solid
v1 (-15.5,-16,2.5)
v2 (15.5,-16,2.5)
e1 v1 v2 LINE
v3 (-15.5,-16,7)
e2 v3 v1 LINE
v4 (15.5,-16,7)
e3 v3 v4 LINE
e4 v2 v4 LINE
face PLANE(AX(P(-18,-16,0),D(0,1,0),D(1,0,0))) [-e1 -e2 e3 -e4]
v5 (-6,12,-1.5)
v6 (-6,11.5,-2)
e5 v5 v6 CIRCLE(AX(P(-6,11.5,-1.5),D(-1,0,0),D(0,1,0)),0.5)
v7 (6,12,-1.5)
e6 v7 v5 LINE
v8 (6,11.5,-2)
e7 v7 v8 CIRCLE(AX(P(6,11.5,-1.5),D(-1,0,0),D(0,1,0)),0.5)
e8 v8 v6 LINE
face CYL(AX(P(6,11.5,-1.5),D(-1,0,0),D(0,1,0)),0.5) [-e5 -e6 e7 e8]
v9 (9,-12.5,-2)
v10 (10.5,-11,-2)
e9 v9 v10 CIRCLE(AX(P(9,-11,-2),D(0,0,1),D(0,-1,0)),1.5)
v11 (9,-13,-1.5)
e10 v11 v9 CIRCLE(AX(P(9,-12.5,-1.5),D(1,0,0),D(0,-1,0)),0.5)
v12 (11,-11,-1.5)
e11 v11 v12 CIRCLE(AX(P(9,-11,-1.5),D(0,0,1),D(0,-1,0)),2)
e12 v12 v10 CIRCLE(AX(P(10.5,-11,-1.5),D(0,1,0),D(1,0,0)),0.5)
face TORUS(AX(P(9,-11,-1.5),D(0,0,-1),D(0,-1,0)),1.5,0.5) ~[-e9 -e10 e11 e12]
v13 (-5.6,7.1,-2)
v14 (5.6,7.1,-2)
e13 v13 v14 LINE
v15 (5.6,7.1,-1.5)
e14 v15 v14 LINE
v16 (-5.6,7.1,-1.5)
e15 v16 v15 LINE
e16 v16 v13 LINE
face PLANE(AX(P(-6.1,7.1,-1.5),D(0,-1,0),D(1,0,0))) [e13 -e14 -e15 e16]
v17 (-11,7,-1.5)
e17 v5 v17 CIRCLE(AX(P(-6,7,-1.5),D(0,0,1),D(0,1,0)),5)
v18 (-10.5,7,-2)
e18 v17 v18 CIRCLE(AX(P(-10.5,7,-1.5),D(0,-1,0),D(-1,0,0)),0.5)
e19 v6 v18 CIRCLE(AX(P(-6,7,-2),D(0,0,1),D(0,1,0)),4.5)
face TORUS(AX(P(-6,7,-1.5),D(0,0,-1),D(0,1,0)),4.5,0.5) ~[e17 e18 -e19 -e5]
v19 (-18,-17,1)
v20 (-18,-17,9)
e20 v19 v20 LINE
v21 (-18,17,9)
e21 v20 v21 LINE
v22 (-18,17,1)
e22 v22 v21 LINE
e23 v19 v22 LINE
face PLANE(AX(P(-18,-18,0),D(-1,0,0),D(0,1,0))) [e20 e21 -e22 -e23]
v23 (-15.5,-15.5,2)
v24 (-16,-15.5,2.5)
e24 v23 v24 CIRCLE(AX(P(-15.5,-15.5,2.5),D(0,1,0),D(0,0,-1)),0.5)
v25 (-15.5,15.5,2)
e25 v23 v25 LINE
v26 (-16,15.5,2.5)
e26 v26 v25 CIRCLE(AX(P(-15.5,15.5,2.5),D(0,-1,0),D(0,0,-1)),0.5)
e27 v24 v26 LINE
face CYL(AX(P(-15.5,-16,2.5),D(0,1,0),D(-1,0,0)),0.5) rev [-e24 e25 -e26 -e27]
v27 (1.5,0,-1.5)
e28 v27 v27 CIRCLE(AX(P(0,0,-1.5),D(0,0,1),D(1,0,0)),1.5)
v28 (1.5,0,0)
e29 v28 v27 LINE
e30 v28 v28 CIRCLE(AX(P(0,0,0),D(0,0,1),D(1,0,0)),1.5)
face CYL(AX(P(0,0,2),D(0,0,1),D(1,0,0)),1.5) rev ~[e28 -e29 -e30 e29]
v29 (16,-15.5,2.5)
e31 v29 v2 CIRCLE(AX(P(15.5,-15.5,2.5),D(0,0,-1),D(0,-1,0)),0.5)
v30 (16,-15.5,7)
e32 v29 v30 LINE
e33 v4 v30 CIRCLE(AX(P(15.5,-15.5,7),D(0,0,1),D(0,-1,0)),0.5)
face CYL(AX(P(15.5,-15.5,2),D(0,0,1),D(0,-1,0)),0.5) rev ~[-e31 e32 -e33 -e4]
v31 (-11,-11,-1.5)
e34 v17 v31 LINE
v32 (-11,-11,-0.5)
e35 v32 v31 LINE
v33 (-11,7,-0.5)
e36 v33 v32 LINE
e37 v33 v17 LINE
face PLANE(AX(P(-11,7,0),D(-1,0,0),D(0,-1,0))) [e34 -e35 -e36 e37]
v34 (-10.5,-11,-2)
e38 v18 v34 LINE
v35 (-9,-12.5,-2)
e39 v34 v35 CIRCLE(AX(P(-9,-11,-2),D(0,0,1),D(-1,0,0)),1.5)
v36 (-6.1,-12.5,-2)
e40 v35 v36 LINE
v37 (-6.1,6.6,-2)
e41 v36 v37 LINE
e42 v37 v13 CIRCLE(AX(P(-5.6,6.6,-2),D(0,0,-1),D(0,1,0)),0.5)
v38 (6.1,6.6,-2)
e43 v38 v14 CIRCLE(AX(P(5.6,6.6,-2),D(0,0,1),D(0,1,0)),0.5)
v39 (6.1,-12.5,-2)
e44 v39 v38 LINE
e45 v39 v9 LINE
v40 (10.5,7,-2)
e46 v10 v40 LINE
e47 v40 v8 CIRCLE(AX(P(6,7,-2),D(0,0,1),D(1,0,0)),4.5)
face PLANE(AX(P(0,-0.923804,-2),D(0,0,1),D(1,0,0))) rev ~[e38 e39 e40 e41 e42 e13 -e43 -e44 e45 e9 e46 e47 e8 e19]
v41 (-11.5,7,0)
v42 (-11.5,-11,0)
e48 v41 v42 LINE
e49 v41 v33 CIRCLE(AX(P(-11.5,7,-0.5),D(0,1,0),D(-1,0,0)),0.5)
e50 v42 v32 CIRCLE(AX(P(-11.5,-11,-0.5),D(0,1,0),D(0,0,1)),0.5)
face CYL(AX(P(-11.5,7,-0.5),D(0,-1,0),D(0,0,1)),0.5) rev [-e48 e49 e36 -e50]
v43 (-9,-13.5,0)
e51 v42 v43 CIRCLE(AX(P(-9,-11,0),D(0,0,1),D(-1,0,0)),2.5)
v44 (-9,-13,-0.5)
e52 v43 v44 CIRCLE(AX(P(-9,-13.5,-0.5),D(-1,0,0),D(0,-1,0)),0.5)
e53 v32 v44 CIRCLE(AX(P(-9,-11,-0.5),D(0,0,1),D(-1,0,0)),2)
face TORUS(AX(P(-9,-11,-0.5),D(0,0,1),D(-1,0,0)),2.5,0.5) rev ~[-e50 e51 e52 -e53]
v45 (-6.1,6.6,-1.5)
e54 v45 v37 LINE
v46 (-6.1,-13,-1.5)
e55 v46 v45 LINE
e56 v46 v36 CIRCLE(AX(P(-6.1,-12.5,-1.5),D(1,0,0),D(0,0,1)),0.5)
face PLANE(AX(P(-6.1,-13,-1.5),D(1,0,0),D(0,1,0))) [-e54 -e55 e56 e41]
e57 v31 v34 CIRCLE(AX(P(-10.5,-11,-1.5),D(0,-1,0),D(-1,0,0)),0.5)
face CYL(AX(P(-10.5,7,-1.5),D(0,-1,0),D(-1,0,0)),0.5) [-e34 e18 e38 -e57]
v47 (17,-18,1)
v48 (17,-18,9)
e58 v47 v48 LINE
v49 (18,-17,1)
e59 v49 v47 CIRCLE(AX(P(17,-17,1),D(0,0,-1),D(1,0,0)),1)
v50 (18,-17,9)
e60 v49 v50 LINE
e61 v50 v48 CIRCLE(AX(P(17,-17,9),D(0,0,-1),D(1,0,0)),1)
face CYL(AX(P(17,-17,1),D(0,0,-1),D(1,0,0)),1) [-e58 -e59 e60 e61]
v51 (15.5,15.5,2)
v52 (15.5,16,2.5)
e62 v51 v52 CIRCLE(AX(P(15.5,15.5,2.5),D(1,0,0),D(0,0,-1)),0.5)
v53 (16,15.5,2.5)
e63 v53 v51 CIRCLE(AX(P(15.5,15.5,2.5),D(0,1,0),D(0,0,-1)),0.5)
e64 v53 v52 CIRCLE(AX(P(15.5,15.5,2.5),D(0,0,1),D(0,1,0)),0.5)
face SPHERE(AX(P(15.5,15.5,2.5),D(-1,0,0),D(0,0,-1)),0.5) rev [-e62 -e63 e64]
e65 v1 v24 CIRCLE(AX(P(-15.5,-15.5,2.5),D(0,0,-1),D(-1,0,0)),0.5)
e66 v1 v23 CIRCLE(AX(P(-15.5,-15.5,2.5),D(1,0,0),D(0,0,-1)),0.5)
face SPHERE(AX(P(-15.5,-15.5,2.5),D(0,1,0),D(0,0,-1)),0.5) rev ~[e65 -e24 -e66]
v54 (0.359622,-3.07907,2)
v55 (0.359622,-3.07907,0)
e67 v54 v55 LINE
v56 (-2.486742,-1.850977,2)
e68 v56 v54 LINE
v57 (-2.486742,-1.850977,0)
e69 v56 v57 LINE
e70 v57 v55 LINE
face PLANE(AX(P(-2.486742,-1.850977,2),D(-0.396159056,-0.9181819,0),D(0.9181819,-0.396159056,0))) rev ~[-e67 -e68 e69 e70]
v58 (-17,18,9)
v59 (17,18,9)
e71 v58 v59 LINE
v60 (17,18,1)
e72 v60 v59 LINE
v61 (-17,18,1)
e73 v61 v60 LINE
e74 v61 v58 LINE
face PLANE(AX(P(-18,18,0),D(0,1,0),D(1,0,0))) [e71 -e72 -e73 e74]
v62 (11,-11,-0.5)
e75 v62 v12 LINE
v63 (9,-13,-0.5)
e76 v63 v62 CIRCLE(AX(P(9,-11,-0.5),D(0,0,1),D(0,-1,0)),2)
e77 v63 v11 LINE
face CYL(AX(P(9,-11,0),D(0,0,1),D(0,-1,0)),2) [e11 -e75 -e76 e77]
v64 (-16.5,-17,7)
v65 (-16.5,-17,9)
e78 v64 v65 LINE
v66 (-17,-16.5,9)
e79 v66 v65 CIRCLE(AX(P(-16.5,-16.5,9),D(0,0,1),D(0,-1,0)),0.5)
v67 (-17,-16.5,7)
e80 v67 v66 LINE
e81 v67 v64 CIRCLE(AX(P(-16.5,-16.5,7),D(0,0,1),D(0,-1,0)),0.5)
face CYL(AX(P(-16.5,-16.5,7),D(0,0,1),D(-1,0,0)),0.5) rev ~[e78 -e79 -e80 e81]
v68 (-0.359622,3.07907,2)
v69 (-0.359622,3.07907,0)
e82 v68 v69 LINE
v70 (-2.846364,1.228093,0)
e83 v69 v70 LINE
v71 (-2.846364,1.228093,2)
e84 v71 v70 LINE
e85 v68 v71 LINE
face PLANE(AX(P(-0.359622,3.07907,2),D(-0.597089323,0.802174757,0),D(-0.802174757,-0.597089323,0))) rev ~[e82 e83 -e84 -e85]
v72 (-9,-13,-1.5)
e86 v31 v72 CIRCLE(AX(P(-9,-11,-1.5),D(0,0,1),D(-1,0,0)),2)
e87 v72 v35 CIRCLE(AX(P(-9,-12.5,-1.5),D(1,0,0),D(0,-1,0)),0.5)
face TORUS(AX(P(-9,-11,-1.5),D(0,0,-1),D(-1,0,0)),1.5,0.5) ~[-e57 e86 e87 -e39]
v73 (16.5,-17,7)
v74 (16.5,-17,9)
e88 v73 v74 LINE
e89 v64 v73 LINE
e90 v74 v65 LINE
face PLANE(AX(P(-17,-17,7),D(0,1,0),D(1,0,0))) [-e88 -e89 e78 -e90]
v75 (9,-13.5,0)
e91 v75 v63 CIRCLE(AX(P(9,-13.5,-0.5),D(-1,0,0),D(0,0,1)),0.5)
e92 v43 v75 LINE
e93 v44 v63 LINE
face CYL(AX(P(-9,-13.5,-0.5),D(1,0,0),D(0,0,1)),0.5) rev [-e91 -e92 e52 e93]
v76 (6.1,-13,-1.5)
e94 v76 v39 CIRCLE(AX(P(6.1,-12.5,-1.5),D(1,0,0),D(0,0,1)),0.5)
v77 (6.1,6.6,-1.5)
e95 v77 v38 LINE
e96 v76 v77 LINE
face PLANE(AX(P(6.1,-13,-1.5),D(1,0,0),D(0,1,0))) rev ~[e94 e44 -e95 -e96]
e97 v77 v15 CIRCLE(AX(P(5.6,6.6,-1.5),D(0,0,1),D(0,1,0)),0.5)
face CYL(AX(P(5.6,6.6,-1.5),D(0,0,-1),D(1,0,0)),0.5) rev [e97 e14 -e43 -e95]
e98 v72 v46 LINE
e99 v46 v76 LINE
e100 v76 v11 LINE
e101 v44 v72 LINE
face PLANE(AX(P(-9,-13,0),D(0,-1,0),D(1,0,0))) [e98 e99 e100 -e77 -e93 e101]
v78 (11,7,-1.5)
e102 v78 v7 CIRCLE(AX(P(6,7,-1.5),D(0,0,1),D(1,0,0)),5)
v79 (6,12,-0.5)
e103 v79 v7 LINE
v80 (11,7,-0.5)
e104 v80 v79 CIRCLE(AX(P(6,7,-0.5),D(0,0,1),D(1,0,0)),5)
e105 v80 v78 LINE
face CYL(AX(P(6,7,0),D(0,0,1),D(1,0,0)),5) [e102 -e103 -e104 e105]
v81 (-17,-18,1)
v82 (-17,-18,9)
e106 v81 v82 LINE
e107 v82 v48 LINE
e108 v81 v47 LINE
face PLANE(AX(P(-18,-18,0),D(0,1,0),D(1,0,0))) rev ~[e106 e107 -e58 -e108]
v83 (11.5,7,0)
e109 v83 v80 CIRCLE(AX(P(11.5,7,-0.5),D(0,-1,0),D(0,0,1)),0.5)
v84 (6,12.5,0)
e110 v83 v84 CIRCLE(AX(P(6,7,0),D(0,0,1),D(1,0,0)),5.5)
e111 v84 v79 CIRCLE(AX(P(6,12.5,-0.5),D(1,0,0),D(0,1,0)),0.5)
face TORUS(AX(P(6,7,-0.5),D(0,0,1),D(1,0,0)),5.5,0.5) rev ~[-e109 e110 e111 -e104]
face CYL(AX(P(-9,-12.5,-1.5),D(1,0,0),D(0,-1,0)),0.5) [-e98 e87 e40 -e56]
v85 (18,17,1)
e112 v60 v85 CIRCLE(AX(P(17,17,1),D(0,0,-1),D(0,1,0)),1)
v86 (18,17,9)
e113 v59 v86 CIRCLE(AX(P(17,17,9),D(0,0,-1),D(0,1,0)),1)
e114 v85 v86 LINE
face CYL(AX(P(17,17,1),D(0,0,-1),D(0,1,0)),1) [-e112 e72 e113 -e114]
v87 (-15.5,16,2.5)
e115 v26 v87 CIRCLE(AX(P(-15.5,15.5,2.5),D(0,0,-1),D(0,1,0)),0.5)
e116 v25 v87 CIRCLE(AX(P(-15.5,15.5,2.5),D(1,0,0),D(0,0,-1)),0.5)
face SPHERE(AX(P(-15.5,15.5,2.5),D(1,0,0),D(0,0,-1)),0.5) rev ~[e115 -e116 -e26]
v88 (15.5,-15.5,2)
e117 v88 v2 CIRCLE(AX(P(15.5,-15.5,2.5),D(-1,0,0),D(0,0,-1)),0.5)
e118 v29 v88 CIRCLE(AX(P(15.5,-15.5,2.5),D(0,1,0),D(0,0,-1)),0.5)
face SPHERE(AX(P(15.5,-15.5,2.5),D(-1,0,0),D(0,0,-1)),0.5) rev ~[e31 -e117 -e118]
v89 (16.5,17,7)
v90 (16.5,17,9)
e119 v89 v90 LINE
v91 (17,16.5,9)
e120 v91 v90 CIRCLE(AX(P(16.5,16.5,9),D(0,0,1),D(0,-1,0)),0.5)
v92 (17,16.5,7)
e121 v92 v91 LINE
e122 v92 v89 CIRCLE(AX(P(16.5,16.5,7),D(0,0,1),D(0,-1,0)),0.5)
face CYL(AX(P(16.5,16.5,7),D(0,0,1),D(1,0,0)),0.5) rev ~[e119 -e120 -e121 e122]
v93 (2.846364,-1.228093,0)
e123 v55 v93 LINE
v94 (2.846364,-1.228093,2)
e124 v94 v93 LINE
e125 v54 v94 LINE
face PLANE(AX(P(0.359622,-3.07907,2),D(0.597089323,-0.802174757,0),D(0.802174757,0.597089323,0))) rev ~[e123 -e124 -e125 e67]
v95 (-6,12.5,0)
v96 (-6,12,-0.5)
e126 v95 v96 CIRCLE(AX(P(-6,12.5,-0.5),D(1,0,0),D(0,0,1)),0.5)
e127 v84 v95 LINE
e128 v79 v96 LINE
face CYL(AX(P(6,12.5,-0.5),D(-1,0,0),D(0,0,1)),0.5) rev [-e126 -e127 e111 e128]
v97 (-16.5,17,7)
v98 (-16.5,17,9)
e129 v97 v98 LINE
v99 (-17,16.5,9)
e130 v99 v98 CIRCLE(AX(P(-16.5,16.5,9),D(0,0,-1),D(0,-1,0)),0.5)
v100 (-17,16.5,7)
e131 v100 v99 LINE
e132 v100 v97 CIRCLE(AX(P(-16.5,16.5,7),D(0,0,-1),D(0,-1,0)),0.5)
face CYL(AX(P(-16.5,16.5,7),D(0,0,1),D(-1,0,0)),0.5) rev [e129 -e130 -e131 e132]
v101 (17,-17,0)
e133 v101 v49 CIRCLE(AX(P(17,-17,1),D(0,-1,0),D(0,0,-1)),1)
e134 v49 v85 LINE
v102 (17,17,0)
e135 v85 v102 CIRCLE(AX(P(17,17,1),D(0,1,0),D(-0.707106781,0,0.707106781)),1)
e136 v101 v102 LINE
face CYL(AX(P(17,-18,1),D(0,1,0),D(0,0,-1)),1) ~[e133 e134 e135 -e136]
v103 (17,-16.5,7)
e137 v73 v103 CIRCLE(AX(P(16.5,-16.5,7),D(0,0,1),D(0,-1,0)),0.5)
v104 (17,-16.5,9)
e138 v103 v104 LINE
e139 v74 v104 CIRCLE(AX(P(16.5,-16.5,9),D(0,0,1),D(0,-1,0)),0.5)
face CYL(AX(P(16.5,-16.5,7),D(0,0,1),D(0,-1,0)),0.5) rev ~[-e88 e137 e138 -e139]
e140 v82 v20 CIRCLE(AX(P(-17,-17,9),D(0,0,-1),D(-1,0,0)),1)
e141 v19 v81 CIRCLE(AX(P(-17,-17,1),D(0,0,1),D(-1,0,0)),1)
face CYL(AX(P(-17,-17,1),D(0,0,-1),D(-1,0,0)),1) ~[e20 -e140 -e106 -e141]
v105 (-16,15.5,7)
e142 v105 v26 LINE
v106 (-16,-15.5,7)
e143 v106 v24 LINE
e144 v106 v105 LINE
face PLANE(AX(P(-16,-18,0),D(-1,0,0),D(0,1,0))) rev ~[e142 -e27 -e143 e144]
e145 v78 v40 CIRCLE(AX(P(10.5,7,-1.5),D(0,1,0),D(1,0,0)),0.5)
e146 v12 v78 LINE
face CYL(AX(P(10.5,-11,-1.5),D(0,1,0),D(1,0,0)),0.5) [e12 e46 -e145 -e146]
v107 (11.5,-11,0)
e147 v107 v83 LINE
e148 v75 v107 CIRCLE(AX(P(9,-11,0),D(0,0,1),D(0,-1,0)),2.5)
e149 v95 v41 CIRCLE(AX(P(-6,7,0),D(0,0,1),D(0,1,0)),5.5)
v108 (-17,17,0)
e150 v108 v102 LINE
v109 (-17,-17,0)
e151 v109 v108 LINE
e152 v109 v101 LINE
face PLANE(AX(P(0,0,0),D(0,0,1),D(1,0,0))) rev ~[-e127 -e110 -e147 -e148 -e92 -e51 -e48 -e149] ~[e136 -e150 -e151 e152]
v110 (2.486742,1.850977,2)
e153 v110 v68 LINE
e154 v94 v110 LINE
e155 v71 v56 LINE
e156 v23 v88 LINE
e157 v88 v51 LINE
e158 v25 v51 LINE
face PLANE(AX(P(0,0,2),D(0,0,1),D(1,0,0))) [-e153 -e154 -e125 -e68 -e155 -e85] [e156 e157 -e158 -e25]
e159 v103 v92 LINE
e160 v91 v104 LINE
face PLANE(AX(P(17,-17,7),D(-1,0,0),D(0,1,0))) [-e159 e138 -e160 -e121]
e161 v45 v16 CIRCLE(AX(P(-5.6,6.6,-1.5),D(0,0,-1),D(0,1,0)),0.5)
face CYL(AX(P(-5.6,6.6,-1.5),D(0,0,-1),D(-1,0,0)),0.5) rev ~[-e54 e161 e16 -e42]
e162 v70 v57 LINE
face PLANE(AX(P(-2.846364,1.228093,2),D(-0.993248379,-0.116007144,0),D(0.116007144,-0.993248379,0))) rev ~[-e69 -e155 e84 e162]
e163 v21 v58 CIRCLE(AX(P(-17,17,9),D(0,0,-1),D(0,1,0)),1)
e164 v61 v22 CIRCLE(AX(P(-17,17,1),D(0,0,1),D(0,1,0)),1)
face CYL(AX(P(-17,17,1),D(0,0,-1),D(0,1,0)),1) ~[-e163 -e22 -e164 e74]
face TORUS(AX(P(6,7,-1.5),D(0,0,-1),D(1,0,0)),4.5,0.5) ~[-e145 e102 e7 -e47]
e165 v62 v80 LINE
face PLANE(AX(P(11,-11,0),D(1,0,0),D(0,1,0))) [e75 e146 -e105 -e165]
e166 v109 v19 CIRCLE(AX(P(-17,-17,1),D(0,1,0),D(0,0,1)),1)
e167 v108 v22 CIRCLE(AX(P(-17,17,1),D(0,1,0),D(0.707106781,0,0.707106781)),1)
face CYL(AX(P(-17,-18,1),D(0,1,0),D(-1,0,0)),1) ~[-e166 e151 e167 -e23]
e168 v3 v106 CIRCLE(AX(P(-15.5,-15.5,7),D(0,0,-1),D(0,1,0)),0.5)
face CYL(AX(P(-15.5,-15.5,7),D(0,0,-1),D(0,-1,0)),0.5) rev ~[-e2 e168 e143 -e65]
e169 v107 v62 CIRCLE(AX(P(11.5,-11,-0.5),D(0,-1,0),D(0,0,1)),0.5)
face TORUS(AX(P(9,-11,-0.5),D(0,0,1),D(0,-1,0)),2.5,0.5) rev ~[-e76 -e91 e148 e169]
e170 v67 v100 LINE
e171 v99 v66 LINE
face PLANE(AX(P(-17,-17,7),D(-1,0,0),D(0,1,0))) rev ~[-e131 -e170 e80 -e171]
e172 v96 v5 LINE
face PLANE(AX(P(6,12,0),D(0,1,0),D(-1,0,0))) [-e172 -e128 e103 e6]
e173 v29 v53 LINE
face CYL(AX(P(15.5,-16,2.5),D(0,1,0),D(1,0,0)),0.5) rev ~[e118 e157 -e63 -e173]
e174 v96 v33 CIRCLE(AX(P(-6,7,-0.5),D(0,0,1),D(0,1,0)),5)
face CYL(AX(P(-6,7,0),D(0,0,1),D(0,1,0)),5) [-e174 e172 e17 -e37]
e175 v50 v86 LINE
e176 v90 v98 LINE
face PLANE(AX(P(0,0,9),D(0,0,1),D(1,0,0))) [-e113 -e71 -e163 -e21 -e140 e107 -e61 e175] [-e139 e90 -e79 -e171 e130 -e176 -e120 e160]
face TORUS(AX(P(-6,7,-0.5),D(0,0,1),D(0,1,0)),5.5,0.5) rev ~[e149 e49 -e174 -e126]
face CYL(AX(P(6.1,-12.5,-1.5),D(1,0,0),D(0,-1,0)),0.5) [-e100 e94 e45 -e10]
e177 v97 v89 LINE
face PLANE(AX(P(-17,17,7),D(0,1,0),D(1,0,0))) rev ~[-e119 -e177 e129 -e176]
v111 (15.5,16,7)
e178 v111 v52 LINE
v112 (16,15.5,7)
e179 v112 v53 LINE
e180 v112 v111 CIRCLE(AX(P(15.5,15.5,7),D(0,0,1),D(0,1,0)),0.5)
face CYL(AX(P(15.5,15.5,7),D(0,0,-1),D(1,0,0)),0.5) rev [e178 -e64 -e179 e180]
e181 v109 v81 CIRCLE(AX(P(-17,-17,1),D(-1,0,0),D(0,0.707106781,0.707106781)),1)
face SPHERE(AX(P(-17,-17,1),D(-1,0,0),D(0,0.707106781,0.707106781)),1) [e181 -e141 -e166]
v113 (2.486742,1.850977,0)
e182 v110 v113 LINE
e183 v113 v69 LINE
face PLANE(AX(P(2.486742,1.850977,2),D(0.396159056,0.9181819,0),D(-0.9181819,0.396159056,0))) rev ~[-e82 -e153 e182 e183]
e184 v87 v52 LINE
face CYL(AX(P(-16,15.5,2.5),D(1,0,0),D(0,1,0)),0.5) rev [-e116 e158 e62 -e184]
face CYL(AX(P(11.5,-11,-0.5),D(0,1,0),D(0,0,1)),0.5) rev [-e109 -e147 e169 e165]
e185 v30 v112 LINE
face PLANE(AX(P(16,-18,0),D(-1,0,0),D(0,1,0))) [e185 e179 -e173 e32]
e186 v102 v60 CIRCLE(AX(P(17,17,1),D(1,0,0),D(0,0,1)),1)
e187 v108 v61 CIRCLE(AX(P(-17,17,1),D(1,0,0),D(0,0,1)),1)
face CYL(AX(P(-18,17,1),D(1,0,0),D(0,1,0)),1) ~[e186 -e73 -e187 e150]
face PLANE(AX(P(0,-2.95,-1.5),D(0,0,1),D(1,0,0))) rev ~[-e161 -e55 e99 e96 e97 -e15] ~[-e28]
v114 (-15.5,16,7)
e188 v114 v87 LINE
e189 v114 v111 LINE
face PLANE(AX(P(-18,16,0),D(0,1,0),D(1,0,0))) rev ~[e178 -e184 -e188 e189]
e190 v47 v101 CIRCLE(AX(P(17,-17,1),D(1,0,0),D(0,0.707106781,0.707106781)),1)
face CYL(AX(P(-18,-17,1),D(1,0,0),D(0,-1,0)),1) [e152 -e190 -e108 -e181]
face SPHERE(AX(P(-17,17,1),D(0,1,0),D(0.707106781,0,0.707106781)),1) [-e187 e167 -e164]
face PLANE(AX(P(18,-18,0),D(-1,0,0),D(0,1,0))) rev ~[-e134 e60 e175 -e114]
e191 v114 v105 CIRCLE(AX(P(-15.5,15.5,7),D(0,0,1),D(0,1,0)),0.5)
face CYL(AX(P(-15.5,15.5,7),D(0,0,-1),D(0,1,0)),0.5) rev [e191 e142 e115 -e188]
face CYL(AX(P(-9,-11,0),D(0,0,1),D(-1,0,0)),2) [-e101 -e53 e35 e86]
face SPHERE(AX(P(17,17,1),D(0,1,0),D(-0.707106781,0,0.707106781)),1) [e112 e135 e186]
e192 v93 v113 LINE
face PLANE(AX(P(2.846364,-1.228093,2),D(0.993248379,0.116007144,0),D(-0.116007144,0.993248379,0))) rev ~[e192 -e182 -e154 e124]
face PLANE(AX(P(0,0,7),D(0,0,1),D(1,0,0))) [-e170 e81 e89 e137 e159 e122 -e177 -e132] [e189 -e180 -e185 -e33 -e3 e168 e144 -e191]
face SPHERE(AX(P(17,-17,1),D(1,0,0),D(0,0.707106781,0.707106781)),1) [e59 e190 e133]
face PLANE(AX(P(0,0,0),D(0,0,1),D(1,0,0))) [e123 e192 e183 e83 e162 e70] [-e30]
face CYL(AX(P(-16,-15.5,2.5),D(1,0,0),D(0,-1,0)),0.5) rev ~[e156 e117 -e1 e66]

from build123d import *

# Parameters (mm, degrees)
F1_W         = 36
F1_H         = 36
F2_DEPTH     = 9
F3_T         = -2
F4_START     = 7
F0_W         = 34
F0_H         = 34
F4_DEPTH     = 3
F5_R         = 1
F6_R         = 0.5
F7_T1_DEPTH  = 10.5
F7_S5_W      = 1
F7_S5_H      = 1
F7_T6_DEPTH  = 1
F7_S11_W     = 1
F7_S11_H     = 1
F7_T12_DEPTH = 1
F7_S17_W     = 1
F7_S17_H     = 1
F7_T18_DEPTH = 1
F7_S23_W     = 1
F7_S23_H     = 1
F7_T24_DEPTH = 1
F9_DEPTH     = 2
F11_START    = -1.5
F10_W        = 12.2
F10_H        = 20.1
F11_DEPTH    = 2.5
F13_DEPTH    = 2
F14_R        = 1.5
F15_DEPTH    = 4.001
F16_R        = 0.5
F17_R        = 0.5


# Not quite as in the source:
# - a fillet or chamfer that OpenCascade refuses, or shapes differently, is made with other operations: its cross-section is extruded or revolved along the edge and cut away or added


with BuildPart() as f2:
    # F1 (on Top) → F2 (new body)
    with BuildSketch(Plane.XY):
        Rectangle(F1_W, F1_H)
    extrude(amount=F2_DEPTH)

    # F3
    f3_openings = [f2.faces().sort_by_distance(p)[0] for p in [
        (0, 0, 9),
    ]]
    offset(amount=F3_T, openings=f3_openings)

    # F0 (on Top) → F4 (cut)
    with BuildSketch(Plane.XY.offset(F4_START)):
        Rectangle(F0_W, F0_H)
    extrude(amount=F4_DEPTH, mode=Mode.SUBTRACT)

    # F5
    f5_edges = [f2.edges().sort_by_distance(p)[0] for p in [
        (18, 0, 0),
        (0, 18, 0),
        (-18, 0, 0),
        (0, -18, 0),
    ]]
    fillet(f5_edges, radius=F5_R)

    # F6
    f6_edges = [f2.edges().sort_by_distance(p)[0] for p in [
        (0, 16, 2),
        (-16, 0, 2),
        (0, -16, 2),
        (16, 0, 2),
        (-16, 16, 4.5),
        (16, 16, 4.5),
        (17, 17, 8),
        (17, -17, 8),
        (16, -16, 4.5),
        (-17, -17, 8),
        (-16, -16, 4.5),
        (-17, 17, 8),
    ]]
    fillet(f6_edges, radius=F6_R)

    # F7: fillet of radius 1 on 4 edges, made by hand

    # F7_s2 → F7_t1 (cut)
    with BuildSketch(Plane.XY.offset(1)):
        with BuildLine():
            ThreePointArc((-18, -17), (-17.7071067812, -17.7071067812), (-17, -18))
            Line((-17, -18), (-18, -18))
            Line((-18, -18), (-18, -17))
        make_face()
        with BuildLine():
            ThreePointArc((17, 18), (17.7071067812, 17.7071067812), (18, 17))
            Line((18, 17), (18, 18))
            Line((18, 18), (17, 18))
        make_face()
        with BuildLine():
            ThreePointArc((18, -17), (17.7071067812, -17.7071067812), (17, -18))
            Line((17, -18), (18, -18))
            Line((18, -18), (18, -17))
        make_face()
        with BuildLine():
            ThreePointArc((-17, 18), (-17.7071067812, 17.7071067812), (-18, 17))
            Line((-18, 17), (-18, 18))
            Line((-18, 18), (-17, 18))
        make_face()
    extrude(amount=F7_T1_DEPTH, mode=Mode.SUBTRACT)


with BuildPart() as f7_tool4:
    # F7_s5 → F7_t6 (new body)
    with BuildSketch(Plane.XZ.offset(-17)):
        with Locations((-17.5, 0.5)):
            Rectangle(F7_S5_W, F7_S5_H)
    extrude(amount=-F7_T6_DEPTH)

    # F7_s7 → F7_t8 (revolve, cut)
    with BuildSketch(Plane(origin=(-17, 17, 1), x_dir=(0.7071067812, 0, 0.7071067812), z_dir=(-0.7071067812, 0, 0.7071067812))):
        with BuildLine():
            ThreePointArc((0, -1), (1, 0), (0, 1))
            Line((0, 1), (0, -1))
        make_face()
    revolve(axis=Axis((-17, 17, 1), (0, 1, 0)), mode=Mode.SUBTRACT)


with BuildPart() as f2_1:
    add(f2.part)

    # F7_t3: cut F7_tool4
    add(f7_tool4.part, mode=Mode.SUBTRACT)


with BuildPart() as f7_tool10:
    # F7_s11 → F7_t12 (new body)
    with BuildSketch(Plane.YZ.offset(17)):
        with Locations((-17.5, 0.5)):
            Rectangle(F7_S11_W, F7_S11_H)
    extrude(amount=F7_T12_DEPTH)

    # F7_s13 → F7_t14 (revolve, cut)
    with BuildSketch(Plane(origin=(17, -17, 1), x_dir=(0, 0.7071067812, 0.7071067812), z_dir=(0, 0.7071067812, -0.7071067812))):
        with BuildLine():
            ThreePointArc((0, -1), (1, 0), (0, 1))
            Line((0, 1), (0, -1))
        make_face()
    revolve(axis=Axis((17, -17, 1), (1, 0, 0)), mode=Mode.SUBTRACT)


with BuildPart() as f2_2:
    add(f2_1.part)

    # F7_t9: cut F7_tool10
    add(f7_tool10.part, mode=Mode.SUBTRACT)


with BuildPart() as f7_tool16:
    # F7_s17 → F7_t18 (new body)
    with BuildSketch(Plane.XZ.offset(-17)):
        with Locations((17.5, 0.5)):
            Rectangle(F7_S17_W, F7_S17_H)
    extrude(amount=-F7_T18_DEPTH)

    # F7_s19 → F7_t20 (revolve, cut)
    with BuildSketch(Plane(origin=(17, 17, 1), x_dir=(-0.7071067812, 0, 0.7071067812), z_dir=(-0.7071067812, 0, -0.7071067812))):
        with BuildLine():
            ThreePointArc((0, -1), (1, 0), (0, 1))
            Line((0, 1), (0, -1))
        make_face()
    revolve(axis=Axis((17, 17, 1), (0, 1, 0)), mode=Mode.SUBTRACT)


with BuildPart() as f2_3:
    add(f2_2.part)

    # F7_t15: cut F7_tool16
    add(f7_tool16.part, mode=Mode.SUBTRACT)


with BuildPart() as f7_tool22:
    # F7_s23 → F7_t24 (new body)
    with BuildSketch(Plane.YZ.offset(-17)):
        with Locations((-17.5, 0.5)):
            Rectangle(F7_S23_W, F7_S23_H)
    extrude(amount=-F7_T24_DEPTH)

    # F7_s25 → F7_t26 (revolve, cut)
    with BuildSketch(Plane(origin=(-17, -17, 1), x_dir=(0, 0.7071067812, 0.7071067812), z_dir=(0, -0.7071067812, 0.7071067812))):
        with BuildLine():
            ThreePointArc((0, -1), (1, 0), (0, 1))
            Line((0, 1), (0, -1))
        make_face()
    revolve(axis=Axis((-17, -17, 1), (-1, 0, 0)), mode=Mode.SUBTRACT)


with BuildPart() as f2_4:
    add(f2_3.part)

    # F7_t21: cut F7_tool22
    add(f7_tool22.part, mode=Mode.SUBTRACT)

    # F8 (on Top) → F9 (join)
    with BuildSketch(Plane.XY):
        with BuildLine():
            ThreePointArc((-11, -11), (-10.4142135624, -12.4142135624), (-9, -13))
            Line((-9, -13), (9, -13))
            ThreePointArc((9, -13), (10.4142135624, -12.4142135624), (11, -11))
            Line((11, -11), (11, 7))
            ThreePointArc((11, 7), (9.5355339059, 10.5355339059), (6, 12))
            Line((6, 12), (-6, 12))
            ThreePointArc((-6, 12), (-9.5355339059, 10.5355339059), (-11, 7))
            Line((-11, 7), (-11, -11))
        make_face()
    extrude(amount=-F9_DEPTH)

    # F10 (on Top) → F11 (cut)
    with BuildSketch(Plane.XY.offset(F11_START)):
        with Locations((0, -2.95)):
            Rectangle(F10_W, F10_H)
    extrude(amount=-F11_DEPTH, mode=Mode.SUBTRACT)

    # F12 (on face) → F13 (cut)
    with BuildSketch(Plane.XY.offset(2)):
        Polygon((-0.3596221451, 3.0790699753), (-2.8463638912, 1.2280930742), (-2.4867417461, -1.850976901), (0.3596221451, -3.0790699753), (2.8463638912, -1.2280930742), (2.4867417461, 1.850976901), align=None)
    extrude(amount=-F13_DEPTH, mode=Mode.SUBTRACT)

    # F14 (on face) → F15 (cut, through all)
    with BuildSketch(Plane.XY.offset(2)):
        Circle(F14_R)
    extrude(amount=-F15_DEPTH, mode=Mode.SUBTRACT)

    # F16
    f16_edges = [f2_4.edges().sort_by_distance(p)[0] for p in [
        (11, -2, 0),
        (6.1, 7.1, -1.75),
        (-6.1, 7.1, -1.75),
    ]]
    fillet(f16_edges, radius=F16_R)

    # F17
    f17_edges = [f2_4.edges().sort_by_distance(p)[0] for p in [
        (7.55, -13, -2),
    ]]
    fillet(f17_edges, radius=F17_R)


solid = f2_4.part
